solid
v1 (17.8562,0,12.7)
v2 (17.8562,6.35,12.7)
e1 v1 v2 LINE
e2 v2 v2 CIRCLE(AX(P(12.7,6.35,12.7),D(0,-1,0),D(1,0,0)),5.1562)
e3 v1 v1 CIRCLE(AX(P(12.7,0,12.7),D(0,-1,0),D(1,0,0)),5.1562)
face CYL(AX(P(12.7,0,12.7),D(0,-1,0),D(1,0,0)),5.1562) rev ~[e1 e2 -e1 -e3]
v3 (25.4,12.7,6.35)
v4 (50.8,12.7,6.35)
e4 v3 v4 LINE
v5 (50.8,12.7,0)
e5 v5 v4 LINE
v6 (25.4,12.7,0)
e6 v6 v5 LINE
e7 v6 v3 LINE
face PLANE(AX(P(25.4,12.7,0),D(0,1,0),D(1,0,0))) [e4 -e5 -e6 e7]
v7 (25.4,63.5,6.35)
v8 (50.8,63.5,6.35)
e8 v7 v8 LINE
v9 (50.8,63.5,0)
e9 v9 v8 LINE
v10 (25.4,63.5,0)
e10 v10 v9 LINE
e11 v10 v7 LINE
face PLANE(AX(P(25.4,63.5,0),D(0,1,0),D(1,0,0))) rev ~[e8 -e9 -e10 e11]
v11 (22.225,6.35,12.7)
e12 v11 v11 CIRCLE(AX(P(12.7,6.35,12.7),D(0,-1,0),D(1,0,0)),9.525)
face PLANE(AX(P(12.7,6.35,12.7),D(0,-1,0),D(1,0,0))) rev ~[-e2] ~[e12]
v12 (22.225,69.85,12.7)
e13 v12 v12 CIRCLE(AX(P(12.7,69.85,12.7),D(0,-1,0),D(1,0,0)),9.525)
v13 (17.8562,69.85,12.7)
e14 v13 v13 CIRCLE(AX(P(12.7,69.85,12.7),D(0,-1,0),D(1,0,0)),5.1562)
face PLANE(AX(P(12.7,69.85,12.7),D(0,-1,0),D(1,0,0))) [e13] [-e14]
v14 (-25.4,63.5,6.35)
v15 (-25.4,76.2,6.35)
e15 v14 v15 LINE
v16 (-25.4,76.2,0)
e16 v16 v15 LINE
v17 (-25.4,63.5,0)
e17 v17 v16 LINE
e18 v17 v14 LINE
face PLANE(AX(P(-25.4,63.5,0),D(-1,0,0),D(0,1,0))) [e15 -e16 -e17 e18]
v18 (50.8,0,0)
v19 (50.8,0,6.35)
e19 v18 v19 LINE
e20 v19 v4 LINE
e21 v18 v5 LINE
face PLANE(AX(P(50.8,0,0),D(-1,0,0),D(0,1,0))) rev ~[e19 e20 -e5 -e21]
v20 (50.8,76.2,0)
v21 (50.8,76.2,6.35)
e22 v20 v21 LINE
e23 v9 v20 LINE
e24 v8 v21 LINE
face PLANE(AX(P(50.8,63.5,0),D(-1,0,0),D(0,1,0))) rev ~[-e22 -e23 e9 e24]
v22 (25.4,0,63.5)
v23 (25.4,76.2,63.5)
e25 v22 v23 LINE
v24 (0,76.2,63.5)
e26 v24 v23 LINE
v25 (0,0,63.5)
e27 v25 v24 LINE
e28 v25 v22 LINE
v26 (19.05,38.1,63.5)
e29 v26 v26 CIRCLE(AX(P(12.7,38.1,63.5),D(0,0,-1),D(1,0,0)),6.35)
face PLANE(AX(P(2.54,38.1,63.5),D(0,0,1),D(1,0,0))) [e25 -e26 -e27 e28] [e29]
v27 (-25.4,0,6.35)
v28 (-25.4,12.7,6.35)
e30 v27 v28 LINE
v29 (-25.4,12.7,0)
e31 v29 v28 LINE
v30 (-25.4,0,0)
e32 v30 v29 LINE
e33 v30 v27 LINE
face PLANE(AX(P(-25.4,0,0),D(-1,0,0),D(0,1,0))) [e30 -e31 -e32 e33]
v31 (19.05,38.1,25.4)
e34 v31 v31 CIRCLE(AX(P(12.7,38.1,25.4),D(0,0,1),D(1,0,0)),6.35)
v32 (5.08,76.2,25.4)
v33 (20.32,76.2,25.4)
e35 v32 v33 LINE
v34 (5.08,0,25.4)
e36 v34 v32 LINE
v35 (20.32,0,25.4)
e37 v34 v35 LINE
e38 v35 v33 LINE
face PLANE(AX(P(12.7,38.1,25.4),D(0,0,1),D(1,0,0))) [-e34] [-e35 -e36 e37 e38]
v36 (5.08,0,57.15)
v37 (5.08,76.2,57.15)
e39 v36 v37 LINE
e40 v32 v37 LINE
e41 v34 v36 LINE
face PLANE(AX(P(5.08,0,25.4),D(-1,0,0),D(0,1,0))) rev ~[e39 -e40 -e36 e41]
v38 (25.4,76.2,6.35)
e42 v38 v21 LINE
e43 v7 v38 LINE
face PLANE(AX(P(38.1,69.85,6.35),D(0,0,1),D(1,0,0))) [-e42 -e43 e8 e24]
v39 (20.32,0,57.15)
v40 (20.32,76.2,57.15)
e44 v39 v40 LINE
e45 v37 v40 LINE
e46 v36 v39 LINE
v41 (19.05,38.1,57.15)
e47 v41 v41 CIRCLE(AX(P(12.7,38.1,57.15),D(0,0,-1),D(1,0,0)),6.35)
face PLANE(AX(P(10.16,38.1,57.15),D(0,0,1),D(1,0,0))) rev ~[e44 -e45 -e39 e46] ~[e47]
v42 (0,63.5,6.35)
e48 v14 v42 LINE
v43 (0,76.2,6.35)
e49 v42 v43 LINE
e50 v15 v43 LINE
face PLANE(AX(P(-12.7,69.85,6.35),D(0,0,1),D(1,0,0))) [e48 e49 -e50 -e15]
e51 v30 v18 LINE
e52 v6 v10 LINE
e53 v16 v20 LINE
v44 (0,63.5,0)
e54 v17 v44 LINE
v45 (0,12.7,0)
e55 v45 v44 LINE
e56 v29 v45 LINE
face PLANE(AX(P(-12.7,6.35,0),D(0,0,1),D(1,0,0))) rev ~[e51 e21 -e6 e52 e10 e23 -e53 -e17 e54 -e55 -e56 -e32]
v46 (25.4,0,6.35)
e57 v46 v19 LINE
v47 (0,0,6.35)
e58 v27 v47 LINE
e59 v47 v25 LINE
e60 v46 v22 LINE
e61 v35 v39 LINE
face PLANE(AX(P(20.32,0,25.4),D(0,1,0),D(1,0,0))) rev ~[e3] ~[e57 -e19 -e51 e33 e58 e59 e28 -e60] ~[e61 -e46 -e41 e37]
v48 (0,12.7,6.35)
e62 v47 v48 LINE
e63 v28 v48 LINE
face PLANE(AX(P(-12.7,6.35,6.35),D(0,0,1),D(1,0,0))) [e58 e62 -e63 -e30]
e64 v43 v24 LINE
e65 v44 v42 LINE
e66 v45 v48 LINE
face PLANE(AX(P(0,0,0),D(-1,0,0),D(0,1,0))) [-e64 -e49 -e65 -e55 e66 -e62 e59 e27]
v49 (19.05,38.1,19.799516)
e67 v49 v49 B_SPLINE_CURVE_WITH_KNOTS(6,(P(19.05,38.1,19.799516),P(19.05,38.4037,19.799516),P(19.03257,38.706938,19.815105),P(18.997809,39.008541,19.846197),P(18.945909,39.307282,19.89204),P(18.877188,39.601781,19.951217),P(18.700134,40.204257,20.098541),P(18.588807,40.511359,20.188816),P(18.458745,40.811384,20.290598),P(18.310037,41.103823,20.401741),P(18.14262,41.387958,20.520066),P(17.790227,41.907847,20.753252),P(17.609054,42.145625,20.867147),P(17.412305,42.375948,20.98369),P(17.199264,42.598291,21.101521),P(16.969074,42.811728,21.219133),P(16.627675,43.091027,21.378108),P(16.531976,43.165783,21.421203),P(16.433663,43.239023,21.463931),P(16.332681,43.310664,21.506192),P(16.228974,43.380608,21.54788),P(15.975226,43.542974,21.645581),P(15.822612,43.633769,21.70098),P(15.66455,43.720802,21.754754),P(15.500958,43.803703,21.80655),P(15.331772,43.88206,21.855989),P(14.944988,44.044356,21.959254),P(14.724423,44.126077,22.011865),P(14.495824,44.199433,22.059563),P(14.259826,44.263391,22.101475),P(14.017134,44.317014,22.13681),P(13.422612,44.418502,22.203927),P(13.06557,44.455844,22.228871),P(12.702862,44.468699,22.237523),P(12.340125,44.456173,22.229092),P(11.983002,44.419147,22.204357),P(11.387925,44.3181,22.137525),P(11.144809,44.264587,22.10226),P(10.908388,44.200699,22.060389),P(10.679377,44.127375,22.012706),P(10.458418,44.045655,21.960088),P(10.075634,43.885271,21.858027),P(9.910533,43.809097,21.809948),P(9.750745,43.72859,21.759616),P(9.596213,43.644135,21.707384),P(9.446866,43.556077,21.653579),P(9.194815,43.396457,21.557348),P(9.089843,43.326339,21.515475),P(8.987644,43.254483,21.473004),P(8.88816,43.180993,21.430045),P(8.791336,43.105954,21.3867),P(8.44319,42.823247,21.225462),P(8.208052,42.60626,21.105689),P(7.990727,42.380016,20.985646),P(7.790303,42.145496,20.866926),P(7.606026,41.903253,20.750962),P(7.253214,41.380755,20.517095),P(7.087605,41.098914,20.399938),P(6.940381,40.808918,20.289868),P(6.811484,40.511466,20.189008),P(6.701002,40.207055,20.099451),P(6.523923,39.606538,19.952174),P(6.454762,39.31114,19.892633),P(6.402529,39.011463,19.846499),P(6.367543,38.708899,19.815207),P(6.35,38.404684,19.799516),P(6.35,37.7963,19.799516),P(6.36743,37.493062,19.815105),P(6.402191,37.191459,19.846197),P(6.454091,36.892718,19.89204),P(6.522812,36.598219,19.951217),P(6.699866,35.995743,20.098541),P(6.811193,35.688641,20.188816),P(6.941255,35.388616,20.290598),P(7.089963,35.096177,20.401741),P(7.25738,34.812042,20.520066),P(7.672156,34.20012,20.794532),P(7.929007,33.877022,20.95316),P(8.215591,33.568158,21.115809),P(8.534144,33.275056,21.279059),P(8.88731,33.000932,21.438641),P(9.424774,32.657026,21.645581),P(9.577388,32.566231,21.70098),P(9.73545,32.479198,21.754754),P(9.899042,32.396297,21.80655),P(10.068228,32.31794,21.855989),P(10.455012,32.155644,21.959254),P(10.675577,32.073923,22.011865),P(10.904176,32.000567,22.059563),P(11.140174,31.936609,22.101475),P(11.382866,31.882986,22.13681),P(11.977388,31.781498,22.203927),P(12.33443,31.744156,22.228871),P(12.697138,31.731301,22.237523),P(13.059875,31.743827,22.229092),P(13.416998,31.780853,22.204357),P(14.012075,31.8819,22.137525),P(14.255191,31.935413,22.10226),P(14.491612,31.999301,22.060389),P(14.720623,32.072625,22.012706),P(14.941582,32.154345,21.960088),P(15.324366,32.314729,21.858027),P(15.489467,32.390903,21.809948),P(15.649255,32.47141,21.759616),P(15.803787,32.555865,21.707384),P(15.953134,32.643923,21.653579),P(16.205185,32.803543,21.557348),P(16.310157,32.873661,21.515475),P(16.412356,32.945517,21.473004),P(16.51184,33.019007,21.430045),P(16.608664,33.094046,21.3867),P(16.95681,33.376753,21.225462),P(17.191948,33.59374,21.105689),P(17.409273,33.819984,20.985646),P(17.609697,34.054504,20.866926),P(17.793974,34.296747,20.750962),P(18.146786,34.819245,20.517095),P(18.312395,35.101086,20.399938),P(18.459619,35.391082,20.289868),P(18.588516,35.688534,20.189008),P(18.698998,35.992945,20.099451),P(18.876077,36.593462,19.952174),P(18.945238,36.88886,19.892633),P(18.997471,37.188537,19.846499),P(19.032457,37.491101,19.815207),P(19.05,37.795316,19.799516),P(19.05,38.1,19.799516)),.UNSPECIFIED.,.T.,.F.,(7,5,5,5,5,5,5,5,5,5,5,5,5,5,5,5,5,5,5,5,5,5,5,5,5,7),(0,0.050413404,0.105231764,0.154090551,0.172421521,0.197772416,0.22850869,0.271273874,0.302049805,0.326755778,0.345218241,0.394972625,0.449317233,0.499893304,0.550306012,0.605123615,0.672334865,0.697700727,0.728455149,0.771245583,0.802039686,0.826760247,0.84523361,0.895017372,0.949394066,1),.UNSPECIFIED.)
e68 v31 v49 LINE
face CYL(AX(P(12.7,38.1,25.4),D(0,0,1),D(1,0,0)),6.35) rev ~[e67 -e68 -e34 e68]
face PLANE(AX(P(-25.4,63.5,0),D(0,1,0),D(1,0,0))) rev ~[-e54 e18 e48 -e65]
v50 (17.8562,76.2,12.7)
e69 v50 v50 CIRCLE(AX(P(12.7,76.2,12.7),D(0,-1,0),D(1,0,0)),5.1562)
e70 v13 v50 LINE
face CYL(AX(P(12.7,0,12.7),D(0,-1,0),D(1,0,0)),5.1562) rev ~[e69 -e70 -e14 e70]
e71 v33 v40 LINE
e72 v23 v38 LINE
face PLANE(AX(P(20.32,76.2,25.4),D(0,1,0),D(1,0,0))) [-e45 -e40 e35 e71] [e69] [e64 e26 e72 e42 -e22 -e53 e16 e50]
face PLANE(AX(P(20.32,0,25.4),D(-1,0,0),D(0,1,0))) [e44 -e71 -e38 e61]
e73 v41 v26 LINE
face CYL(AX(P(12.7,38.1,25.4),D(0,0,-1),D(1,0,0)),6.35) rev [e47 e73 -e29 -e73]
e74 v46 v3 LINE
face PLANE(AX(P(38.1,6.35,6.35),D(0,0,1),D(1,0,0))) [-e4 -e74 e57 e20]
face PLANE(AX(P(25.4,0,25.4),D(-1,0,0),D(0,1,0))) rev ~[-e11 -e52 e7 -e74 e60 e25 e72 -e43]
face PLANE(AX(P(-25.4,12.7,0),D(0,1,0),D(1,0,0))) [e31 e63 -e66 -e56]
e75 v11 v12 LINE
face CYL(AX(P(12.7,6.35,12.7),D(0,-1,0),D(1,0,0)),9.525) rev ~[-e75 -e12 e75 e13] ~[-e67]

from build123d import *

# Parameters (mm, degrees)
F0_W           = 25.4
F0_H           = 76.2
F1_DEPTH       = 25.4
F2_W           = 25.4
F2_H           = 12.7
F3_DEPTH       = 6.35
F5_START       = -6.35
F4_R           = 9.525
F5_DEPTH       = 63.5
F6_R           = 5.1562
F7_DEPTH       = 76.201
F9_W           = 5.08
F9_H           = 76.2
F10_DEPTH      = 38.1
F11_W          = 20.32
F11_H          = 76.2
F12_DEPTH      = 6.35
F8_R           = 6.35
F13_DEPTH      = 5.6014842716
F13_DEPTH_BACK = 38.101


with BuildPart() as f1:
    # F0 (on Top) → F1 (new body)
    with BuildSketch(Plane.XY):
        with Locations((12.7, 38.1)):
            Rectangle(F0_W, F0_H)
    extrude(amount=F1_DEPTH)

    # F2 (on Top) → F3 (join)
    with BuildSketch(Plane.XY):
        with Locations((-12.7, 6.35)):
            Rectangle(F2_W, F2_H)
        with Locations((38.1, 6.35)):
            Rectangle(F2_W, F2_H)
        with Locations((-12.7, 69.85)):
            Rectangle(F2_W, F2_H)
        with Locations((38.1, 69.85)):
            Rectangle(F2_W, F2_H)
    extrude(amount=F3_DEPTH)

    # F4 (on face) → F5 (cut)
    with BuildSketch(Plane.XZ.offset(F5_START)):
        with Locations((12.7, 12.7)):
            Circle(F4_R)
    extrude(amount=-F5_DEPTH, mode=Mode.SUBTRACT)

    # F6 (on face) → F7 (cut, through all)
    with BuildSketch(Plane.XZ):
        with Locations((12.7, 12.7)):
            Circle(F6_R)
    extrude(amount=-F7_DEPTH, mode=Mode.SUBTRACT)

    # F9 (on face) → F10 (join)
    with BuildSketch(Plane.XY.offset(25.4)):
        with Locations((22.86, 38.1)):
            Rectangle(F9_W, F9_H)
        with Locations((2.54, 38.1)):
            Rectangle(F9_W, F9_H)
    extrude(amount=F10_DEPTH)

    # F11 (on face) → F12 (join)
    with BuildSketch(Plane.XY.offset(63.5)):
        with Locations((10.16, 38.1)):
            Rectangle(F11_W, F11_H)
    extrude(amount=-F12_DEPTH)

    # F8 (on face) → F13 (cut, two sides)
    with BuildSketch(Plane.XY.offset(25.4)) as f13_sk:
        with Locations((12.7, 38.1)):
            Circle(F8_R)
    extrude(amount=-F13_DEPTH, mode=Mode.SUBTRACT)
    extrude(f13_sk.sketch, amount=F13_DEPTH_BACK, mode=Mode.SUBTRACT)


solid = f1.part
